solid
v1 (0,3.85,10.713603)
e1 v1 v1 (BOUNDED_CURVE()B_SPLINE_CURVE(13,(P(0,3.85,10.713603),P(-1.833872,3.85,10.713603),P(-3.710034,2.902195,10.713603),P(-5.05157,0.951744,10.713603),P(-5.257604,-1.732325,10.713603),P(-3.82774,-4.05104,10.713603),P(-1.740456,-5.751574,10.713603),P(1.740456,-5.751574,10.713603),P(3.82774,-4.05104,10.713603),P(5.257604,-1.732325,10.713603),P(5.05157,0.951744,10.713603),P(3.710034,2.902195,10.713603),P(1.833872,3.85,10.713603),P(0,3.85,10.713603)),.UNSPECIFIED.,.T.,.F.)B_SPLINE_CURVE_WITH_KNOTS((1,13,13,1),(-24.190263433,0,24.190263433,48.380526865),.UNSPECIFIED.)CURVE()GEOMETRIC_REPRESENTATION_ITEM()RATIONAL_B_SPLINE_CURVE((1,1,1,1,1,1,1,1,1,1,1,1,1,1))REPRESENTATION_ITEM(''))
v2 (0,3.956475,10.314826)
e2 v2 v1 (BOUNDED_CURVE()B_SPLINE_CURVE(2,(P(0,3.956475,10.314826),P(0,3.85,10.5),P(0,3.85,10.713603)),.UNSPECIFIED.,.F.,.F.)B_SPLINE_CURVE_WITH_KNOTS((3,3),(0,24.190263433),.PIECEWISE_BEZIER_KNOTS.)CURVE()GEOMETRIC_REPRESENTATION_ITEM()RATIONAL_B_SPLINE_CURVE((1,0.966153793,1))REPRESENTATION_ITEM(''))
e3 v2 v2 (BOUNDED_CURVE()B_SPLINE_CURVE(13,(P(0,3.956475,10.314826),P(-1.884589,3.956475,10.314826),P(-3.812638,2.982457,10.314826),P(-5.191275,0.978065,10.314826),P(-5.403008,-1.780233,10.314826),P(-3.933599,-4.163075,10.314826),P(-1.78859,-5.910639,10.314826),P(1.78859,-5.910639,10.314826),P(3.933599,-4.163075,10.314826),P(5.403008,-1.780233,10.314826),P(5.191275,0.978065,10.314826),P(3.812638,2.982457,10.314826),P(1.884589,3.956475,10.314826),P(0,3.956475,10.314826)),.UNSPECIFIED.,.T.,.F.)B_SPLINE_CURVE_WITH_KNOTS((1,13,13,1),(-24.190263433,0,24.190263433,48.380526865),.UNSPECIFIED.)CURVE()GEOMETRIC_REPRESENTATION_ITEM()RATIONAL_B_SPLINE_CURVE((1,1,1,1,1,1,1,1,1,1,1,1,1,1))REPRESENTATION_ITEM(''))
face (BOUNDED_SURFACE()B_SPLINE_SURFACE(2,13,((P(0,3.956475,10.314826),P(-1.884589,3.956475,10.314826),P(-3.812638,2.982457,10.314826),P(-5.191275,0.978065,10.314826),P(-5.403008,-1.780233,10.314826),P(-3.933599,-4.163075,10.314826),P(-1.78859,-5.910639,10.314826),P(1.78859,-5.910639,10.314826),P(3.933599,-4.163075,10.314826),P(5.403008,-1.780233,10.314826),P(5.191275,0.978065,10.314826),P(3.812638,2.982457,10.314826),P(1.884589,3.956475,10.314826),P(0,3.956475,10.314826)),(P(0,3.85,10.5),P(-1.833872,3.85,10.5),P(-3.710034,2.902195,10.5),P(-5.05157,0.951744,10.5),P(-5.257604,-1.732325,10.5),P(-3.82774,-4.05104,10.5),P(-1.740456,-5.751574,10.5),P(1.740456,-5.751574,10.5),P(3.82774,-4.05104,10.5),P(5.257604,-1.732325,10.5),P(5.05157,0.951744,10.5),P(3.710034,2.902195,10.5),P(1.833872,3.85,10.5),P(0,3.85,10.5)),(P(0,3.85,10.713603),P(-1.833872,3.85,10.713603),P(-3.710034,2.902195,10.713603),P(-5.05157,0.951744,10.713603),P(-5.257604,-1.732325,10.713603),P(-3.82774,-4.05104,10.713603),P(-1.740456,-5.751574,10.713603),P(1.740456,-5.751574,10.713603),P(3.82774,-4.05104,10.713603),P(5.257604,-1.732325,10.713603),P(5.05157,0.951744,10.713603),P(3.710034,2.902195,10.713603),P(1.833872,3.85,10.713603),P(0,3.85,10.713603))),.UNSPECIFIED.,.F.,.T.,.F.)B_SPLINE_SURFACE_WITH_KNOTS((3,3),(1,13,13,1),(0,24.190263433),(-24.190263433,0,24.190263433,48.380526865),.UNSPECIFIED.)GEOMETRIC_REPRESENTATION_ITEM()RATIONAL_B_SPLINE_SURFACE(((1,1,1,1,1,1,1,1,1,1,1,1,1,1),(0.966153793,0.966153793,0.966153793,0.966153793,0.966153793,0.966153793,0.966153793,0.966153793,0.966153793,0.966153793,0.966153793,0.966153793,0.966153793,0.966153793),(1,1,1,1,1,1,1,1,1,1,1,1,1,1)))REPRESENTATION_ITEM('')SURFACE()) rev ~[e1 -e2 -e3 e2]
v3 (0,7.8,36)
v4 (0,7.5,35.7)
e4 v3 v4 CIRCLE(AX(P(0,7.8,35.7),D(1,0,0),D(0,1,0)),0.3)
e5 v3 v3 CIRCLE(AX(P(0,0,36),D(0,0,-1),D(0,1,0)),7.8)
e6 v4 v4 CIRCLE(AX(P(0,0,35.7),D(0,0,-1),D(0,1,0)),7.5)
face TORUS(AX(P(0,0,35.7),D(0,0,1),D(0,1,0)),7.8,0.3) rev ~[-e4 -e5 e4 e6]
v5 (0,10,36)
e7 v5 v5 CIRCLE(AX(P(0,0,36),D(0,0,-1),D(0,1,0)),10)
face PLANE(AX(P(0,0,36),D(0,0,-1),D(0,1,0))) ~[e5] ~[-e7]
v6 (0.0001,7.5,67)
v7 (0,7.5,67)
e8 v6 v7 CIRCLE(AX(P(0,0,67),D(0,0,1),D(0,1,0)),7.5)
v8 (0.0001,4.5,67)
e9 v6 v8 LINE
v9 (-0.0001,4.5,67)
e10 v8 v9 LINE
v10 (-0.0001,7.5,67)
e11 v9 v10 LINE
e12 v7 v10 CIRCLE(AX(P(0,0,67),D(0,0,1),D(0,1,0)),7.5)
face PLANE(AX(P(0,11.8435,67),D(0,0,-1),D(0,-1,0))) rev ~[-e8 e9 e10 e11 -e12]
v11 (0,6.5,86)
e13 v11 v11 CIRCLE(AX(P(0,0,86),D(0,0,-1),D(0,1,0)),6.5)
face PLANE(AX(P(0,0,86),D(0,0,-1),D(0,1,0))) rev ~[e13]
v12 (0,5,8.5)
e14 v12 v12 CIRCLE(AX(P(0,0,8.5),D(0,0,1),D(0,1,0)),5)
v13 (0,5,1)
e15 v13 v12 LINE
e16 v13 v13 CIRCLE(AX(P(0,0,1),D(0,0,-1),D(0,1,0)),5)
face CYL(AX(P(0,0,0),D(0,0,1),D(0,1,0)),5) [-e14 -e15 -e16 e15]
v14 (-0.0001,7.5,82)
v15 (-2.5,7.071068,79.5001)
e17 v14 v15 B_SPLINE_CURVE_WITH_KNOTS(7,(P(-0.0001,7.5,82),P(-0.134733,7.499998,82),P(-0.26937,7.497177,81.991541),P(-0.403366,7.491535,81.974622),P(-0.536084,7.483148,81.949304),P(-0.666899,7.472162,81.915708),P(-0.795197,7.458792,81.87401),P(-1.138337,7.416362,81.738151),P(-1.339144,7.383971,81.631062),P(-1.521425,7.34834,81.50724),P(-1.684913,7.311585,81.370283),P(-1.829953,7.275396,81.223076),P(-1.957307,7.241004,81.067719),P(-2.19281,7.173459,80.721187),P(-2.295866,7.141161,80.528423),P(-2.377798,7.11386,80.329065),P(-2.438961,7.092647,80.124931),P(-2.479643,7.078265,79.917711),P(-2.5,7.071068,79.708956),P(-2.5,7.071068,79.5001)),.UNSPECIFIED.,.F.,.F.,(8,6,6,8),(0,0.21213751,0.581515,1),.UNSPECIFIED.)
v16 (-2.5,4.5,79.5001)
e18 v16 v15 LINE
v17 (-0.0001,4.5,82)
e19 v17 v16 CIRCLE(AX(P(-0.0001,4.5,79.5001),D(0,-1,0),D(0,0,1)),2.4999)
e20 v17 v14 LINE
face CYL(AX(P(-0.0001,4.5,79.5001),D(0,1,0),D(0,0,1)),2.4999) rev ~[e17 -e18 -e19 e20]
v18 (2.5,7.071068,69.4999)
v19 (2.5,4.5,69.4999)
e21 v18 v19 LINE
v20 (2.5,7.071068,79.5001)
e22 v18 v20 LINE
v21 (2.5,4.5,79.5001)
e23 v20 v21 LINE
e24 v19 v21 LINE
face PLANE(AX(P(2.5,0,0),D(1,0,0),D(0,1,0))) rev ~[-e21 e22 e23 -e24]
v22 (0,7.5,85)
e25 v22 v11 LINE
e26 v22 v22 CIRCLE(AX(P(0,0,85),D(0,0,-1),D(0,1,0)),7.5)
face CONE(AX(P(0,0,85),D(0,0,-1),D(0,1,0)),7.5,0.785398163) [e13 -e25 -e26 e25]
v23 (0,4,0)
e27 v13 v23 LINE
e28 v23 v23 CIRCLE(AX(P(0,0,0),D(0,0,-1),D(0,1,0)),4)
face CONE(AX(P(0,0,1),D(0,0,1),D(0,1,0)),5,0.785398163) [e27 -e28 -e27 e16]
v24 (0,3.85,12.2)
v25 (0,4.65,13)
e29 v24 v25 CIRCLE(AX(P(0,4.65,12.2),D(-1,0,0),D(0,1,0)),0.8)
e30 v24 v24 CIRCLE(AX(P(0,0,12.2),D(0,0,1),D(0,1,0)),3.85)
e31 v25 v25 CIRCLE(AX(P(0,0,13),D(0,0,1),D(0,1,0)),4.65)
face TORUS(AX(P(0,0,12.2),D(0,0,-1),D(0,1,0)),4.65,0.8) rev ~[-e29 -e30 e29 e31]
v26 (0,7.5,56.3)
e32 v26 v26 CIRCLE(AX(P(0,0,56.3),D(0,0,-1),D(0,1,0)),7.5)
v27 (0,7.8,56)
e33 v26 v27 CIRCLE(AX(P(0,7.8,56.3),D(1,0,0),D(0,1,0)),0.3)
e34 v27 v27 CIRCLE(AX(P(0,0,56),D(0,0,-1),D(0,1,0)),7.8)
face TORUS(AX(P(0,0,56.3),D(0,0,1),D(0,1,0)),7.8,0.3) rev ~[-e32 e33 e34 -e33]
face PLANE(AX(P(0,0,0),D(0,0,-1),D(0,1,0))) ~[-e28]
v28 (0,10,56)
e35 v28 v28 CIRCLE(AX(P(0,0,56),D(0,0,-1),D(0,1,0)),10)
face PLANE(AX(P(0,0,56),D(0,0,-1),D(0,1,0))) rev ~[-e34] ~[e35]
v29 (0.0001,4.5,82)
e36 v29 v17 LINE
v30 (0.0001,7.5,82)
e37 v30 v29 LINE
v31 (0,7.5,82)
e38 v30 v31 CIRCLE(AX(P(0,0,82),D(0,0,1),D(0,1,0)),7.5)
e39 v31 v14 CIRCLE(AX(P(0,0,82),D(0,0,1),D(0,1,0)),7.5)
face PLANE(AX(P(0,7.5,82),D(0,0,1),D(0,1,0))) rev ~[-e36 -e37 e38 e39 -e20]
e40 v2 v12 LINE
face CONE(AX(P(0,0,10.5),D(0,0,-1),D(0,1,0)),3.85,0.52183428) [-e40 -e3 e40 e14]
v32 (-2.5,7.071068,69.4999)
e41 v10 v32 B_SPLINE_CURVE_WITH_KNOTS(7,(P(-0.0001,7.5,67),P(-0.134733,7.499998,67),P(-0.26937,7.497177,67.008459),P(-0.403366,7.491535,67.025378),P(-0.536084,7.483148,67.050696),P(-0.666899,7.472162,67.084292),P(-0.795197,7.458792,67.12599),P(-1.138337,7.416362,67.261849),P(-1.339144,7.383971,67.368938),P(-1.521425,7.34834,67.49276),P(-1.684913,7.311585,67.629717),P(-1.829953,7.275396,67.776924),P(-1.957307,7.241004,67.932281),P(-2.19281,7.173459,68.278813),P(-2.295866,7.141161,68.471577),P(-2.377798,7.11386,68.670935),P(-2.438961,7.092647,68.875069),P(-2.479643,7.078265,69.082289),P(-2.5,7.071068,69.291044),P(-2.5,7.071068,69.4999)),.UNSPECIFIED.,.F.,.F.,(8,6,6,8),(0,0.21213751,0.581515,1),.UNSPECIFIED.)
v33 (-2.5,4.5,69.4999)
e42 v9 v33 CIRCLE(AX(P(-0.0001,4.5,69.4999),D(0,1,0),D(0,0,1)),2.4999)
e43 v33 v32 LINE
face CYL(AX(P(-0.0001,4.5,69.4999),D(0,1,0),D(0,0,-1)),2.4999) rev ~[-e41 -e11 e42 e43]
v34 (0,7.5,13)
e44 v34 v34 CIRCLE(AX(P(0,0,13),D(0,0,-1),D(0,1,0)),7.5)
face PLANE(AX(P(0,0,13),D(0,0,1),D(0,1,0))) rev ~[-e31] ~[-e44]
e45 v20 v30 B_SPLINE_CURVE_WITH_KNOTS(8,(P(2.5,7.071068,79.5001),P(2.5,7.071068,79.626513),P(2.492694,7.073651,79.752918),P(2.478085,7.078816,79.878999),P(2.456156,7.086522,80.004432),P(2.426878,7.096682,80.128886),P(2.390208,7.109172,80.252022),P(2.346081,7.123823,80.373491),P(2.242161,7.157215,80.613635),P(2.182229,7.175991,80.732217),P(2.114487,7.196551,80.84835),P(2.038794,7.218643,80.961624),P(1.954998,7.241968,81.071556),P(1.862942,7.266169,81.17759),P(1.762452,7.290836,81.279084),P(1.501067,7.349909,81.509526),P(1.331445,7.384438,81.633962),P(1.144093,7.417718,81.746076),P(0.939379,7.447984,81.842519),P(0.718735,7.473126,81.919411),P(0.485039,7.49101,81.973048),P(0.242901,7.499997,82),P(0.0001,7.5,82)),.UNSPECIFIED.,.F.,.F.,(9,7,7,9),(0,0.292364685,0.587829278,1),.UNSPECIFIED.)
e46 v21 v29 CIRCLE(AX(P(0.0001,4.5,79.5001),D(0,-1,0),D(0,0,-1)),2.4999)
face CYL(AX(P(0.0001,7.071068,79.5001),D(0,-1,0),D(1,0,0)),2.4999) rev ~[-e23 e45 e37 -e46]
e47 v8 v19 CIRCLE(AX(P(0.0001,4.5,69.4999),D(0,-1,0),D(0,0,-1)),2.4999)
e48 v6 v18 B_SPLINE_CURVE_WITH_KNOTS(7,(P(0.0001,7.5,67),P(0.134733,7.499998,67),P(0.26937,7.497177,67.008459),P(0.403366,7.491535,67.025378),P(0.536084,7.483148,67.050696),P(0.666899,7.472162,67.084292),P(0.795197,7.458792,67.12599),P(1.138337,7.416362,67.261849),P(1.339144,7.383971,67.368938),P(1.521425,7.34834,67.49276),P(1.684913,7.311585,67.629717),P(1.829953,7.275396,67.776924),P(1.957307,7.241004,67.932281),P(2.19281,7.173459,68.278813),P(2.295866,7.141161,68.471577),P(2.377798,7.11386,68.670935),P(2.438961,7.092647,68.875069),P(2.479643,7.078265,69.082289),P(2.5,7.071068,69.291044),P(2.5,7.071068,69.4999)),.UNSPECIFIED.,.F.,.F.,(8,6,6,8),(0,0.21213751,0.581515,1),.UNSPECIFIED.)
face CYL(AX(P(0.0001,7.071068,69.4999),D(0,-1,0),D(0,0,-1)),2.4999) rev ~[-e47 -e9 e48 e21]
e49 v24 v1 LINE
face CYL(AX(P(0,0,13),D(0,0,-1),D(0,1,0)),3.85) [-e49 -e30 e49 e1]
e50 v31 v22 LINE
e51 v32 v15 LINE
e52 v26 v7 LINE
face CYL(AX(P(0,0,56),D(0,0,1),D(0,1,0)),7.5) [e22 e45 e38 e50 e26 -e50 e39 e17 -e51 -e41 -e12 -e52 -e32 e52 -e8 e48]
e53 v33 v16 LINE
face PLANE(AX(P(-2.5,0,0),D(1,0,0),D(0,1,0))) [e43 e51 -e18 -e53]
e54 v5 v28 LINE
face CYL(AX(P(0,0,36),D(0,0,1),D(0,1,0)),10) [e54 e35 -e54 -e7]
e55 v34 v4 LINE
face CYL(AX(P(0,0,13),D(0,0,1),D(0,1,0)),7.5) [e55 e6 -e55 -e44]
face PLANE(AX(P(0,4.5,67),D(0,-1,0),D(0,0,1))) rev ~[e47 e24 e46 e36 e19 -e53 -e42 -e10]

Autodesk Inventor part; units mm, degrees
ref_plane "YZ Plane" through (0, 0, 0) normal (1, 0, 0) x (0, 1, 0)
ref_plane "XZ Plane" through (0, 0, 0) normal (0, 1, 0) x (-1, 0, 0)
ref_plane "XY Plane" through (0, 0, 0) normal (0, 0, 1) x (1, 0, 0)
sketch "스케치1" plane through (0, 0, 0) normal (1, 0, 0) x (0, 1, 0)
  line L0 (0, 0) -> (5, 0)
  line L1 (5, 0) -> (5, 13)
  line L2 (5, 13) -> (0, 13)
  line L3 (0, 13) -> (0, 0)
  line L4 (0, 13) -> (7.5, 13)
  line L5 (7.5, 13) -> (7.5, 36)
  line L6 (7.5, 36) -> (0, 36)
  line L7 (0, 36) -> (0, 13)
  line L8 (0, 36) -> (10, 36)
  line L9 (10, 36) -> (10, 56)
  line L10 (10, 56) -> (0, 56)
  line L11 (0, 56) -> (0, 36)
  line L12 (0, 56) -> (7.5, 56)
  line L13 (7.5, 56) -> (7.5, 86)
  line L14 (7.5, 86) -> (0, 86)
  line L15 (0, 86) -> (0, 56)
  dimension "d0" = 10
  dimension "d1" = 15
  dimension "d2" = 20
  dimension "d3" = 15
  dimension "d4" = 13
  dimension "d5" = 23
  dimension "d6" = 20
  dimension "d7" = 30
revolve "회전1" add sketch "스케치1" angle 360 about axis through (0, 0, 36) along (0, 0, -1)
sketch "스케치2" plane through (0, 0, 0) normal (1, 0, 0) x (0, 1, 0)
  line L0 (5, 8.5) -> (5, 13)
  line L1 (5, 13) -> (3.85, 13)
  line L2 (3.85, 13) -> (3.85, 10.5)
  line L3 (3.85, 10.5) -> (5, 8.5)
  line L4 (-5, 13) -> (5, 13) projected
  line L5 (0, -17.2) -> (0, 103.2) projected
  point P0 (0, 0)
  dimension "d9" = 4.5
  dimension "d10" = 1.15
  dimension "d11" = 2.5
revolve "회전3" cut sketch "스케치2" angle 360 about axis through (0, 0, -10) along (0, 0, 1)
fillet "모깎기1" radius 0.8 2 edges at (0, -3.85, 10.5) (0, -3.85, 13)
thread "스레드1" size "M10x1.5" class "6g" standard "ANSI Metric M Profile" full length
chamfer "모따기1" distance 1 angle 45 2 edges at (0, -5, 0) (0, -7.5, 86)
sketch "스케치3" plane through (0, 0, 0) normal (1, 0, 0) x (0, 1, 0)
  line L0 (11.8435, 67) -> (4.5, 67)
  line L1 (4.5, 67) -> (4.5, 82)
  line L2 (4.5, 82) -> (11.8435, 82)
  line L3 (11.8435, 82) -> (11.8435, 67)
  line L4 (-7.5, 86) -> (7.5, 86) projected
  line L5 (7.5, 86) -> (7.5, 56) projected
  point P0 (0, 0)
  dimension "d20" = 15
  dimension "d21" = 4
  dimension "d22" = 3
extrude "돌출1" cut sketch "스케치3" along normal mid plane 5
fillet "모깎기2" radius 2.5 4 edges at (2.5, 5.7855, 67) (-2.5, 5.7855, 67) (-2.5, 5.7855, 82) (2.5, 5.7855, 82)
fillet "모깎기3" radius 0.3 2 edges at (0, -7.5, 36) (0, -7.5, 56)
properties part number "3강 축1"
